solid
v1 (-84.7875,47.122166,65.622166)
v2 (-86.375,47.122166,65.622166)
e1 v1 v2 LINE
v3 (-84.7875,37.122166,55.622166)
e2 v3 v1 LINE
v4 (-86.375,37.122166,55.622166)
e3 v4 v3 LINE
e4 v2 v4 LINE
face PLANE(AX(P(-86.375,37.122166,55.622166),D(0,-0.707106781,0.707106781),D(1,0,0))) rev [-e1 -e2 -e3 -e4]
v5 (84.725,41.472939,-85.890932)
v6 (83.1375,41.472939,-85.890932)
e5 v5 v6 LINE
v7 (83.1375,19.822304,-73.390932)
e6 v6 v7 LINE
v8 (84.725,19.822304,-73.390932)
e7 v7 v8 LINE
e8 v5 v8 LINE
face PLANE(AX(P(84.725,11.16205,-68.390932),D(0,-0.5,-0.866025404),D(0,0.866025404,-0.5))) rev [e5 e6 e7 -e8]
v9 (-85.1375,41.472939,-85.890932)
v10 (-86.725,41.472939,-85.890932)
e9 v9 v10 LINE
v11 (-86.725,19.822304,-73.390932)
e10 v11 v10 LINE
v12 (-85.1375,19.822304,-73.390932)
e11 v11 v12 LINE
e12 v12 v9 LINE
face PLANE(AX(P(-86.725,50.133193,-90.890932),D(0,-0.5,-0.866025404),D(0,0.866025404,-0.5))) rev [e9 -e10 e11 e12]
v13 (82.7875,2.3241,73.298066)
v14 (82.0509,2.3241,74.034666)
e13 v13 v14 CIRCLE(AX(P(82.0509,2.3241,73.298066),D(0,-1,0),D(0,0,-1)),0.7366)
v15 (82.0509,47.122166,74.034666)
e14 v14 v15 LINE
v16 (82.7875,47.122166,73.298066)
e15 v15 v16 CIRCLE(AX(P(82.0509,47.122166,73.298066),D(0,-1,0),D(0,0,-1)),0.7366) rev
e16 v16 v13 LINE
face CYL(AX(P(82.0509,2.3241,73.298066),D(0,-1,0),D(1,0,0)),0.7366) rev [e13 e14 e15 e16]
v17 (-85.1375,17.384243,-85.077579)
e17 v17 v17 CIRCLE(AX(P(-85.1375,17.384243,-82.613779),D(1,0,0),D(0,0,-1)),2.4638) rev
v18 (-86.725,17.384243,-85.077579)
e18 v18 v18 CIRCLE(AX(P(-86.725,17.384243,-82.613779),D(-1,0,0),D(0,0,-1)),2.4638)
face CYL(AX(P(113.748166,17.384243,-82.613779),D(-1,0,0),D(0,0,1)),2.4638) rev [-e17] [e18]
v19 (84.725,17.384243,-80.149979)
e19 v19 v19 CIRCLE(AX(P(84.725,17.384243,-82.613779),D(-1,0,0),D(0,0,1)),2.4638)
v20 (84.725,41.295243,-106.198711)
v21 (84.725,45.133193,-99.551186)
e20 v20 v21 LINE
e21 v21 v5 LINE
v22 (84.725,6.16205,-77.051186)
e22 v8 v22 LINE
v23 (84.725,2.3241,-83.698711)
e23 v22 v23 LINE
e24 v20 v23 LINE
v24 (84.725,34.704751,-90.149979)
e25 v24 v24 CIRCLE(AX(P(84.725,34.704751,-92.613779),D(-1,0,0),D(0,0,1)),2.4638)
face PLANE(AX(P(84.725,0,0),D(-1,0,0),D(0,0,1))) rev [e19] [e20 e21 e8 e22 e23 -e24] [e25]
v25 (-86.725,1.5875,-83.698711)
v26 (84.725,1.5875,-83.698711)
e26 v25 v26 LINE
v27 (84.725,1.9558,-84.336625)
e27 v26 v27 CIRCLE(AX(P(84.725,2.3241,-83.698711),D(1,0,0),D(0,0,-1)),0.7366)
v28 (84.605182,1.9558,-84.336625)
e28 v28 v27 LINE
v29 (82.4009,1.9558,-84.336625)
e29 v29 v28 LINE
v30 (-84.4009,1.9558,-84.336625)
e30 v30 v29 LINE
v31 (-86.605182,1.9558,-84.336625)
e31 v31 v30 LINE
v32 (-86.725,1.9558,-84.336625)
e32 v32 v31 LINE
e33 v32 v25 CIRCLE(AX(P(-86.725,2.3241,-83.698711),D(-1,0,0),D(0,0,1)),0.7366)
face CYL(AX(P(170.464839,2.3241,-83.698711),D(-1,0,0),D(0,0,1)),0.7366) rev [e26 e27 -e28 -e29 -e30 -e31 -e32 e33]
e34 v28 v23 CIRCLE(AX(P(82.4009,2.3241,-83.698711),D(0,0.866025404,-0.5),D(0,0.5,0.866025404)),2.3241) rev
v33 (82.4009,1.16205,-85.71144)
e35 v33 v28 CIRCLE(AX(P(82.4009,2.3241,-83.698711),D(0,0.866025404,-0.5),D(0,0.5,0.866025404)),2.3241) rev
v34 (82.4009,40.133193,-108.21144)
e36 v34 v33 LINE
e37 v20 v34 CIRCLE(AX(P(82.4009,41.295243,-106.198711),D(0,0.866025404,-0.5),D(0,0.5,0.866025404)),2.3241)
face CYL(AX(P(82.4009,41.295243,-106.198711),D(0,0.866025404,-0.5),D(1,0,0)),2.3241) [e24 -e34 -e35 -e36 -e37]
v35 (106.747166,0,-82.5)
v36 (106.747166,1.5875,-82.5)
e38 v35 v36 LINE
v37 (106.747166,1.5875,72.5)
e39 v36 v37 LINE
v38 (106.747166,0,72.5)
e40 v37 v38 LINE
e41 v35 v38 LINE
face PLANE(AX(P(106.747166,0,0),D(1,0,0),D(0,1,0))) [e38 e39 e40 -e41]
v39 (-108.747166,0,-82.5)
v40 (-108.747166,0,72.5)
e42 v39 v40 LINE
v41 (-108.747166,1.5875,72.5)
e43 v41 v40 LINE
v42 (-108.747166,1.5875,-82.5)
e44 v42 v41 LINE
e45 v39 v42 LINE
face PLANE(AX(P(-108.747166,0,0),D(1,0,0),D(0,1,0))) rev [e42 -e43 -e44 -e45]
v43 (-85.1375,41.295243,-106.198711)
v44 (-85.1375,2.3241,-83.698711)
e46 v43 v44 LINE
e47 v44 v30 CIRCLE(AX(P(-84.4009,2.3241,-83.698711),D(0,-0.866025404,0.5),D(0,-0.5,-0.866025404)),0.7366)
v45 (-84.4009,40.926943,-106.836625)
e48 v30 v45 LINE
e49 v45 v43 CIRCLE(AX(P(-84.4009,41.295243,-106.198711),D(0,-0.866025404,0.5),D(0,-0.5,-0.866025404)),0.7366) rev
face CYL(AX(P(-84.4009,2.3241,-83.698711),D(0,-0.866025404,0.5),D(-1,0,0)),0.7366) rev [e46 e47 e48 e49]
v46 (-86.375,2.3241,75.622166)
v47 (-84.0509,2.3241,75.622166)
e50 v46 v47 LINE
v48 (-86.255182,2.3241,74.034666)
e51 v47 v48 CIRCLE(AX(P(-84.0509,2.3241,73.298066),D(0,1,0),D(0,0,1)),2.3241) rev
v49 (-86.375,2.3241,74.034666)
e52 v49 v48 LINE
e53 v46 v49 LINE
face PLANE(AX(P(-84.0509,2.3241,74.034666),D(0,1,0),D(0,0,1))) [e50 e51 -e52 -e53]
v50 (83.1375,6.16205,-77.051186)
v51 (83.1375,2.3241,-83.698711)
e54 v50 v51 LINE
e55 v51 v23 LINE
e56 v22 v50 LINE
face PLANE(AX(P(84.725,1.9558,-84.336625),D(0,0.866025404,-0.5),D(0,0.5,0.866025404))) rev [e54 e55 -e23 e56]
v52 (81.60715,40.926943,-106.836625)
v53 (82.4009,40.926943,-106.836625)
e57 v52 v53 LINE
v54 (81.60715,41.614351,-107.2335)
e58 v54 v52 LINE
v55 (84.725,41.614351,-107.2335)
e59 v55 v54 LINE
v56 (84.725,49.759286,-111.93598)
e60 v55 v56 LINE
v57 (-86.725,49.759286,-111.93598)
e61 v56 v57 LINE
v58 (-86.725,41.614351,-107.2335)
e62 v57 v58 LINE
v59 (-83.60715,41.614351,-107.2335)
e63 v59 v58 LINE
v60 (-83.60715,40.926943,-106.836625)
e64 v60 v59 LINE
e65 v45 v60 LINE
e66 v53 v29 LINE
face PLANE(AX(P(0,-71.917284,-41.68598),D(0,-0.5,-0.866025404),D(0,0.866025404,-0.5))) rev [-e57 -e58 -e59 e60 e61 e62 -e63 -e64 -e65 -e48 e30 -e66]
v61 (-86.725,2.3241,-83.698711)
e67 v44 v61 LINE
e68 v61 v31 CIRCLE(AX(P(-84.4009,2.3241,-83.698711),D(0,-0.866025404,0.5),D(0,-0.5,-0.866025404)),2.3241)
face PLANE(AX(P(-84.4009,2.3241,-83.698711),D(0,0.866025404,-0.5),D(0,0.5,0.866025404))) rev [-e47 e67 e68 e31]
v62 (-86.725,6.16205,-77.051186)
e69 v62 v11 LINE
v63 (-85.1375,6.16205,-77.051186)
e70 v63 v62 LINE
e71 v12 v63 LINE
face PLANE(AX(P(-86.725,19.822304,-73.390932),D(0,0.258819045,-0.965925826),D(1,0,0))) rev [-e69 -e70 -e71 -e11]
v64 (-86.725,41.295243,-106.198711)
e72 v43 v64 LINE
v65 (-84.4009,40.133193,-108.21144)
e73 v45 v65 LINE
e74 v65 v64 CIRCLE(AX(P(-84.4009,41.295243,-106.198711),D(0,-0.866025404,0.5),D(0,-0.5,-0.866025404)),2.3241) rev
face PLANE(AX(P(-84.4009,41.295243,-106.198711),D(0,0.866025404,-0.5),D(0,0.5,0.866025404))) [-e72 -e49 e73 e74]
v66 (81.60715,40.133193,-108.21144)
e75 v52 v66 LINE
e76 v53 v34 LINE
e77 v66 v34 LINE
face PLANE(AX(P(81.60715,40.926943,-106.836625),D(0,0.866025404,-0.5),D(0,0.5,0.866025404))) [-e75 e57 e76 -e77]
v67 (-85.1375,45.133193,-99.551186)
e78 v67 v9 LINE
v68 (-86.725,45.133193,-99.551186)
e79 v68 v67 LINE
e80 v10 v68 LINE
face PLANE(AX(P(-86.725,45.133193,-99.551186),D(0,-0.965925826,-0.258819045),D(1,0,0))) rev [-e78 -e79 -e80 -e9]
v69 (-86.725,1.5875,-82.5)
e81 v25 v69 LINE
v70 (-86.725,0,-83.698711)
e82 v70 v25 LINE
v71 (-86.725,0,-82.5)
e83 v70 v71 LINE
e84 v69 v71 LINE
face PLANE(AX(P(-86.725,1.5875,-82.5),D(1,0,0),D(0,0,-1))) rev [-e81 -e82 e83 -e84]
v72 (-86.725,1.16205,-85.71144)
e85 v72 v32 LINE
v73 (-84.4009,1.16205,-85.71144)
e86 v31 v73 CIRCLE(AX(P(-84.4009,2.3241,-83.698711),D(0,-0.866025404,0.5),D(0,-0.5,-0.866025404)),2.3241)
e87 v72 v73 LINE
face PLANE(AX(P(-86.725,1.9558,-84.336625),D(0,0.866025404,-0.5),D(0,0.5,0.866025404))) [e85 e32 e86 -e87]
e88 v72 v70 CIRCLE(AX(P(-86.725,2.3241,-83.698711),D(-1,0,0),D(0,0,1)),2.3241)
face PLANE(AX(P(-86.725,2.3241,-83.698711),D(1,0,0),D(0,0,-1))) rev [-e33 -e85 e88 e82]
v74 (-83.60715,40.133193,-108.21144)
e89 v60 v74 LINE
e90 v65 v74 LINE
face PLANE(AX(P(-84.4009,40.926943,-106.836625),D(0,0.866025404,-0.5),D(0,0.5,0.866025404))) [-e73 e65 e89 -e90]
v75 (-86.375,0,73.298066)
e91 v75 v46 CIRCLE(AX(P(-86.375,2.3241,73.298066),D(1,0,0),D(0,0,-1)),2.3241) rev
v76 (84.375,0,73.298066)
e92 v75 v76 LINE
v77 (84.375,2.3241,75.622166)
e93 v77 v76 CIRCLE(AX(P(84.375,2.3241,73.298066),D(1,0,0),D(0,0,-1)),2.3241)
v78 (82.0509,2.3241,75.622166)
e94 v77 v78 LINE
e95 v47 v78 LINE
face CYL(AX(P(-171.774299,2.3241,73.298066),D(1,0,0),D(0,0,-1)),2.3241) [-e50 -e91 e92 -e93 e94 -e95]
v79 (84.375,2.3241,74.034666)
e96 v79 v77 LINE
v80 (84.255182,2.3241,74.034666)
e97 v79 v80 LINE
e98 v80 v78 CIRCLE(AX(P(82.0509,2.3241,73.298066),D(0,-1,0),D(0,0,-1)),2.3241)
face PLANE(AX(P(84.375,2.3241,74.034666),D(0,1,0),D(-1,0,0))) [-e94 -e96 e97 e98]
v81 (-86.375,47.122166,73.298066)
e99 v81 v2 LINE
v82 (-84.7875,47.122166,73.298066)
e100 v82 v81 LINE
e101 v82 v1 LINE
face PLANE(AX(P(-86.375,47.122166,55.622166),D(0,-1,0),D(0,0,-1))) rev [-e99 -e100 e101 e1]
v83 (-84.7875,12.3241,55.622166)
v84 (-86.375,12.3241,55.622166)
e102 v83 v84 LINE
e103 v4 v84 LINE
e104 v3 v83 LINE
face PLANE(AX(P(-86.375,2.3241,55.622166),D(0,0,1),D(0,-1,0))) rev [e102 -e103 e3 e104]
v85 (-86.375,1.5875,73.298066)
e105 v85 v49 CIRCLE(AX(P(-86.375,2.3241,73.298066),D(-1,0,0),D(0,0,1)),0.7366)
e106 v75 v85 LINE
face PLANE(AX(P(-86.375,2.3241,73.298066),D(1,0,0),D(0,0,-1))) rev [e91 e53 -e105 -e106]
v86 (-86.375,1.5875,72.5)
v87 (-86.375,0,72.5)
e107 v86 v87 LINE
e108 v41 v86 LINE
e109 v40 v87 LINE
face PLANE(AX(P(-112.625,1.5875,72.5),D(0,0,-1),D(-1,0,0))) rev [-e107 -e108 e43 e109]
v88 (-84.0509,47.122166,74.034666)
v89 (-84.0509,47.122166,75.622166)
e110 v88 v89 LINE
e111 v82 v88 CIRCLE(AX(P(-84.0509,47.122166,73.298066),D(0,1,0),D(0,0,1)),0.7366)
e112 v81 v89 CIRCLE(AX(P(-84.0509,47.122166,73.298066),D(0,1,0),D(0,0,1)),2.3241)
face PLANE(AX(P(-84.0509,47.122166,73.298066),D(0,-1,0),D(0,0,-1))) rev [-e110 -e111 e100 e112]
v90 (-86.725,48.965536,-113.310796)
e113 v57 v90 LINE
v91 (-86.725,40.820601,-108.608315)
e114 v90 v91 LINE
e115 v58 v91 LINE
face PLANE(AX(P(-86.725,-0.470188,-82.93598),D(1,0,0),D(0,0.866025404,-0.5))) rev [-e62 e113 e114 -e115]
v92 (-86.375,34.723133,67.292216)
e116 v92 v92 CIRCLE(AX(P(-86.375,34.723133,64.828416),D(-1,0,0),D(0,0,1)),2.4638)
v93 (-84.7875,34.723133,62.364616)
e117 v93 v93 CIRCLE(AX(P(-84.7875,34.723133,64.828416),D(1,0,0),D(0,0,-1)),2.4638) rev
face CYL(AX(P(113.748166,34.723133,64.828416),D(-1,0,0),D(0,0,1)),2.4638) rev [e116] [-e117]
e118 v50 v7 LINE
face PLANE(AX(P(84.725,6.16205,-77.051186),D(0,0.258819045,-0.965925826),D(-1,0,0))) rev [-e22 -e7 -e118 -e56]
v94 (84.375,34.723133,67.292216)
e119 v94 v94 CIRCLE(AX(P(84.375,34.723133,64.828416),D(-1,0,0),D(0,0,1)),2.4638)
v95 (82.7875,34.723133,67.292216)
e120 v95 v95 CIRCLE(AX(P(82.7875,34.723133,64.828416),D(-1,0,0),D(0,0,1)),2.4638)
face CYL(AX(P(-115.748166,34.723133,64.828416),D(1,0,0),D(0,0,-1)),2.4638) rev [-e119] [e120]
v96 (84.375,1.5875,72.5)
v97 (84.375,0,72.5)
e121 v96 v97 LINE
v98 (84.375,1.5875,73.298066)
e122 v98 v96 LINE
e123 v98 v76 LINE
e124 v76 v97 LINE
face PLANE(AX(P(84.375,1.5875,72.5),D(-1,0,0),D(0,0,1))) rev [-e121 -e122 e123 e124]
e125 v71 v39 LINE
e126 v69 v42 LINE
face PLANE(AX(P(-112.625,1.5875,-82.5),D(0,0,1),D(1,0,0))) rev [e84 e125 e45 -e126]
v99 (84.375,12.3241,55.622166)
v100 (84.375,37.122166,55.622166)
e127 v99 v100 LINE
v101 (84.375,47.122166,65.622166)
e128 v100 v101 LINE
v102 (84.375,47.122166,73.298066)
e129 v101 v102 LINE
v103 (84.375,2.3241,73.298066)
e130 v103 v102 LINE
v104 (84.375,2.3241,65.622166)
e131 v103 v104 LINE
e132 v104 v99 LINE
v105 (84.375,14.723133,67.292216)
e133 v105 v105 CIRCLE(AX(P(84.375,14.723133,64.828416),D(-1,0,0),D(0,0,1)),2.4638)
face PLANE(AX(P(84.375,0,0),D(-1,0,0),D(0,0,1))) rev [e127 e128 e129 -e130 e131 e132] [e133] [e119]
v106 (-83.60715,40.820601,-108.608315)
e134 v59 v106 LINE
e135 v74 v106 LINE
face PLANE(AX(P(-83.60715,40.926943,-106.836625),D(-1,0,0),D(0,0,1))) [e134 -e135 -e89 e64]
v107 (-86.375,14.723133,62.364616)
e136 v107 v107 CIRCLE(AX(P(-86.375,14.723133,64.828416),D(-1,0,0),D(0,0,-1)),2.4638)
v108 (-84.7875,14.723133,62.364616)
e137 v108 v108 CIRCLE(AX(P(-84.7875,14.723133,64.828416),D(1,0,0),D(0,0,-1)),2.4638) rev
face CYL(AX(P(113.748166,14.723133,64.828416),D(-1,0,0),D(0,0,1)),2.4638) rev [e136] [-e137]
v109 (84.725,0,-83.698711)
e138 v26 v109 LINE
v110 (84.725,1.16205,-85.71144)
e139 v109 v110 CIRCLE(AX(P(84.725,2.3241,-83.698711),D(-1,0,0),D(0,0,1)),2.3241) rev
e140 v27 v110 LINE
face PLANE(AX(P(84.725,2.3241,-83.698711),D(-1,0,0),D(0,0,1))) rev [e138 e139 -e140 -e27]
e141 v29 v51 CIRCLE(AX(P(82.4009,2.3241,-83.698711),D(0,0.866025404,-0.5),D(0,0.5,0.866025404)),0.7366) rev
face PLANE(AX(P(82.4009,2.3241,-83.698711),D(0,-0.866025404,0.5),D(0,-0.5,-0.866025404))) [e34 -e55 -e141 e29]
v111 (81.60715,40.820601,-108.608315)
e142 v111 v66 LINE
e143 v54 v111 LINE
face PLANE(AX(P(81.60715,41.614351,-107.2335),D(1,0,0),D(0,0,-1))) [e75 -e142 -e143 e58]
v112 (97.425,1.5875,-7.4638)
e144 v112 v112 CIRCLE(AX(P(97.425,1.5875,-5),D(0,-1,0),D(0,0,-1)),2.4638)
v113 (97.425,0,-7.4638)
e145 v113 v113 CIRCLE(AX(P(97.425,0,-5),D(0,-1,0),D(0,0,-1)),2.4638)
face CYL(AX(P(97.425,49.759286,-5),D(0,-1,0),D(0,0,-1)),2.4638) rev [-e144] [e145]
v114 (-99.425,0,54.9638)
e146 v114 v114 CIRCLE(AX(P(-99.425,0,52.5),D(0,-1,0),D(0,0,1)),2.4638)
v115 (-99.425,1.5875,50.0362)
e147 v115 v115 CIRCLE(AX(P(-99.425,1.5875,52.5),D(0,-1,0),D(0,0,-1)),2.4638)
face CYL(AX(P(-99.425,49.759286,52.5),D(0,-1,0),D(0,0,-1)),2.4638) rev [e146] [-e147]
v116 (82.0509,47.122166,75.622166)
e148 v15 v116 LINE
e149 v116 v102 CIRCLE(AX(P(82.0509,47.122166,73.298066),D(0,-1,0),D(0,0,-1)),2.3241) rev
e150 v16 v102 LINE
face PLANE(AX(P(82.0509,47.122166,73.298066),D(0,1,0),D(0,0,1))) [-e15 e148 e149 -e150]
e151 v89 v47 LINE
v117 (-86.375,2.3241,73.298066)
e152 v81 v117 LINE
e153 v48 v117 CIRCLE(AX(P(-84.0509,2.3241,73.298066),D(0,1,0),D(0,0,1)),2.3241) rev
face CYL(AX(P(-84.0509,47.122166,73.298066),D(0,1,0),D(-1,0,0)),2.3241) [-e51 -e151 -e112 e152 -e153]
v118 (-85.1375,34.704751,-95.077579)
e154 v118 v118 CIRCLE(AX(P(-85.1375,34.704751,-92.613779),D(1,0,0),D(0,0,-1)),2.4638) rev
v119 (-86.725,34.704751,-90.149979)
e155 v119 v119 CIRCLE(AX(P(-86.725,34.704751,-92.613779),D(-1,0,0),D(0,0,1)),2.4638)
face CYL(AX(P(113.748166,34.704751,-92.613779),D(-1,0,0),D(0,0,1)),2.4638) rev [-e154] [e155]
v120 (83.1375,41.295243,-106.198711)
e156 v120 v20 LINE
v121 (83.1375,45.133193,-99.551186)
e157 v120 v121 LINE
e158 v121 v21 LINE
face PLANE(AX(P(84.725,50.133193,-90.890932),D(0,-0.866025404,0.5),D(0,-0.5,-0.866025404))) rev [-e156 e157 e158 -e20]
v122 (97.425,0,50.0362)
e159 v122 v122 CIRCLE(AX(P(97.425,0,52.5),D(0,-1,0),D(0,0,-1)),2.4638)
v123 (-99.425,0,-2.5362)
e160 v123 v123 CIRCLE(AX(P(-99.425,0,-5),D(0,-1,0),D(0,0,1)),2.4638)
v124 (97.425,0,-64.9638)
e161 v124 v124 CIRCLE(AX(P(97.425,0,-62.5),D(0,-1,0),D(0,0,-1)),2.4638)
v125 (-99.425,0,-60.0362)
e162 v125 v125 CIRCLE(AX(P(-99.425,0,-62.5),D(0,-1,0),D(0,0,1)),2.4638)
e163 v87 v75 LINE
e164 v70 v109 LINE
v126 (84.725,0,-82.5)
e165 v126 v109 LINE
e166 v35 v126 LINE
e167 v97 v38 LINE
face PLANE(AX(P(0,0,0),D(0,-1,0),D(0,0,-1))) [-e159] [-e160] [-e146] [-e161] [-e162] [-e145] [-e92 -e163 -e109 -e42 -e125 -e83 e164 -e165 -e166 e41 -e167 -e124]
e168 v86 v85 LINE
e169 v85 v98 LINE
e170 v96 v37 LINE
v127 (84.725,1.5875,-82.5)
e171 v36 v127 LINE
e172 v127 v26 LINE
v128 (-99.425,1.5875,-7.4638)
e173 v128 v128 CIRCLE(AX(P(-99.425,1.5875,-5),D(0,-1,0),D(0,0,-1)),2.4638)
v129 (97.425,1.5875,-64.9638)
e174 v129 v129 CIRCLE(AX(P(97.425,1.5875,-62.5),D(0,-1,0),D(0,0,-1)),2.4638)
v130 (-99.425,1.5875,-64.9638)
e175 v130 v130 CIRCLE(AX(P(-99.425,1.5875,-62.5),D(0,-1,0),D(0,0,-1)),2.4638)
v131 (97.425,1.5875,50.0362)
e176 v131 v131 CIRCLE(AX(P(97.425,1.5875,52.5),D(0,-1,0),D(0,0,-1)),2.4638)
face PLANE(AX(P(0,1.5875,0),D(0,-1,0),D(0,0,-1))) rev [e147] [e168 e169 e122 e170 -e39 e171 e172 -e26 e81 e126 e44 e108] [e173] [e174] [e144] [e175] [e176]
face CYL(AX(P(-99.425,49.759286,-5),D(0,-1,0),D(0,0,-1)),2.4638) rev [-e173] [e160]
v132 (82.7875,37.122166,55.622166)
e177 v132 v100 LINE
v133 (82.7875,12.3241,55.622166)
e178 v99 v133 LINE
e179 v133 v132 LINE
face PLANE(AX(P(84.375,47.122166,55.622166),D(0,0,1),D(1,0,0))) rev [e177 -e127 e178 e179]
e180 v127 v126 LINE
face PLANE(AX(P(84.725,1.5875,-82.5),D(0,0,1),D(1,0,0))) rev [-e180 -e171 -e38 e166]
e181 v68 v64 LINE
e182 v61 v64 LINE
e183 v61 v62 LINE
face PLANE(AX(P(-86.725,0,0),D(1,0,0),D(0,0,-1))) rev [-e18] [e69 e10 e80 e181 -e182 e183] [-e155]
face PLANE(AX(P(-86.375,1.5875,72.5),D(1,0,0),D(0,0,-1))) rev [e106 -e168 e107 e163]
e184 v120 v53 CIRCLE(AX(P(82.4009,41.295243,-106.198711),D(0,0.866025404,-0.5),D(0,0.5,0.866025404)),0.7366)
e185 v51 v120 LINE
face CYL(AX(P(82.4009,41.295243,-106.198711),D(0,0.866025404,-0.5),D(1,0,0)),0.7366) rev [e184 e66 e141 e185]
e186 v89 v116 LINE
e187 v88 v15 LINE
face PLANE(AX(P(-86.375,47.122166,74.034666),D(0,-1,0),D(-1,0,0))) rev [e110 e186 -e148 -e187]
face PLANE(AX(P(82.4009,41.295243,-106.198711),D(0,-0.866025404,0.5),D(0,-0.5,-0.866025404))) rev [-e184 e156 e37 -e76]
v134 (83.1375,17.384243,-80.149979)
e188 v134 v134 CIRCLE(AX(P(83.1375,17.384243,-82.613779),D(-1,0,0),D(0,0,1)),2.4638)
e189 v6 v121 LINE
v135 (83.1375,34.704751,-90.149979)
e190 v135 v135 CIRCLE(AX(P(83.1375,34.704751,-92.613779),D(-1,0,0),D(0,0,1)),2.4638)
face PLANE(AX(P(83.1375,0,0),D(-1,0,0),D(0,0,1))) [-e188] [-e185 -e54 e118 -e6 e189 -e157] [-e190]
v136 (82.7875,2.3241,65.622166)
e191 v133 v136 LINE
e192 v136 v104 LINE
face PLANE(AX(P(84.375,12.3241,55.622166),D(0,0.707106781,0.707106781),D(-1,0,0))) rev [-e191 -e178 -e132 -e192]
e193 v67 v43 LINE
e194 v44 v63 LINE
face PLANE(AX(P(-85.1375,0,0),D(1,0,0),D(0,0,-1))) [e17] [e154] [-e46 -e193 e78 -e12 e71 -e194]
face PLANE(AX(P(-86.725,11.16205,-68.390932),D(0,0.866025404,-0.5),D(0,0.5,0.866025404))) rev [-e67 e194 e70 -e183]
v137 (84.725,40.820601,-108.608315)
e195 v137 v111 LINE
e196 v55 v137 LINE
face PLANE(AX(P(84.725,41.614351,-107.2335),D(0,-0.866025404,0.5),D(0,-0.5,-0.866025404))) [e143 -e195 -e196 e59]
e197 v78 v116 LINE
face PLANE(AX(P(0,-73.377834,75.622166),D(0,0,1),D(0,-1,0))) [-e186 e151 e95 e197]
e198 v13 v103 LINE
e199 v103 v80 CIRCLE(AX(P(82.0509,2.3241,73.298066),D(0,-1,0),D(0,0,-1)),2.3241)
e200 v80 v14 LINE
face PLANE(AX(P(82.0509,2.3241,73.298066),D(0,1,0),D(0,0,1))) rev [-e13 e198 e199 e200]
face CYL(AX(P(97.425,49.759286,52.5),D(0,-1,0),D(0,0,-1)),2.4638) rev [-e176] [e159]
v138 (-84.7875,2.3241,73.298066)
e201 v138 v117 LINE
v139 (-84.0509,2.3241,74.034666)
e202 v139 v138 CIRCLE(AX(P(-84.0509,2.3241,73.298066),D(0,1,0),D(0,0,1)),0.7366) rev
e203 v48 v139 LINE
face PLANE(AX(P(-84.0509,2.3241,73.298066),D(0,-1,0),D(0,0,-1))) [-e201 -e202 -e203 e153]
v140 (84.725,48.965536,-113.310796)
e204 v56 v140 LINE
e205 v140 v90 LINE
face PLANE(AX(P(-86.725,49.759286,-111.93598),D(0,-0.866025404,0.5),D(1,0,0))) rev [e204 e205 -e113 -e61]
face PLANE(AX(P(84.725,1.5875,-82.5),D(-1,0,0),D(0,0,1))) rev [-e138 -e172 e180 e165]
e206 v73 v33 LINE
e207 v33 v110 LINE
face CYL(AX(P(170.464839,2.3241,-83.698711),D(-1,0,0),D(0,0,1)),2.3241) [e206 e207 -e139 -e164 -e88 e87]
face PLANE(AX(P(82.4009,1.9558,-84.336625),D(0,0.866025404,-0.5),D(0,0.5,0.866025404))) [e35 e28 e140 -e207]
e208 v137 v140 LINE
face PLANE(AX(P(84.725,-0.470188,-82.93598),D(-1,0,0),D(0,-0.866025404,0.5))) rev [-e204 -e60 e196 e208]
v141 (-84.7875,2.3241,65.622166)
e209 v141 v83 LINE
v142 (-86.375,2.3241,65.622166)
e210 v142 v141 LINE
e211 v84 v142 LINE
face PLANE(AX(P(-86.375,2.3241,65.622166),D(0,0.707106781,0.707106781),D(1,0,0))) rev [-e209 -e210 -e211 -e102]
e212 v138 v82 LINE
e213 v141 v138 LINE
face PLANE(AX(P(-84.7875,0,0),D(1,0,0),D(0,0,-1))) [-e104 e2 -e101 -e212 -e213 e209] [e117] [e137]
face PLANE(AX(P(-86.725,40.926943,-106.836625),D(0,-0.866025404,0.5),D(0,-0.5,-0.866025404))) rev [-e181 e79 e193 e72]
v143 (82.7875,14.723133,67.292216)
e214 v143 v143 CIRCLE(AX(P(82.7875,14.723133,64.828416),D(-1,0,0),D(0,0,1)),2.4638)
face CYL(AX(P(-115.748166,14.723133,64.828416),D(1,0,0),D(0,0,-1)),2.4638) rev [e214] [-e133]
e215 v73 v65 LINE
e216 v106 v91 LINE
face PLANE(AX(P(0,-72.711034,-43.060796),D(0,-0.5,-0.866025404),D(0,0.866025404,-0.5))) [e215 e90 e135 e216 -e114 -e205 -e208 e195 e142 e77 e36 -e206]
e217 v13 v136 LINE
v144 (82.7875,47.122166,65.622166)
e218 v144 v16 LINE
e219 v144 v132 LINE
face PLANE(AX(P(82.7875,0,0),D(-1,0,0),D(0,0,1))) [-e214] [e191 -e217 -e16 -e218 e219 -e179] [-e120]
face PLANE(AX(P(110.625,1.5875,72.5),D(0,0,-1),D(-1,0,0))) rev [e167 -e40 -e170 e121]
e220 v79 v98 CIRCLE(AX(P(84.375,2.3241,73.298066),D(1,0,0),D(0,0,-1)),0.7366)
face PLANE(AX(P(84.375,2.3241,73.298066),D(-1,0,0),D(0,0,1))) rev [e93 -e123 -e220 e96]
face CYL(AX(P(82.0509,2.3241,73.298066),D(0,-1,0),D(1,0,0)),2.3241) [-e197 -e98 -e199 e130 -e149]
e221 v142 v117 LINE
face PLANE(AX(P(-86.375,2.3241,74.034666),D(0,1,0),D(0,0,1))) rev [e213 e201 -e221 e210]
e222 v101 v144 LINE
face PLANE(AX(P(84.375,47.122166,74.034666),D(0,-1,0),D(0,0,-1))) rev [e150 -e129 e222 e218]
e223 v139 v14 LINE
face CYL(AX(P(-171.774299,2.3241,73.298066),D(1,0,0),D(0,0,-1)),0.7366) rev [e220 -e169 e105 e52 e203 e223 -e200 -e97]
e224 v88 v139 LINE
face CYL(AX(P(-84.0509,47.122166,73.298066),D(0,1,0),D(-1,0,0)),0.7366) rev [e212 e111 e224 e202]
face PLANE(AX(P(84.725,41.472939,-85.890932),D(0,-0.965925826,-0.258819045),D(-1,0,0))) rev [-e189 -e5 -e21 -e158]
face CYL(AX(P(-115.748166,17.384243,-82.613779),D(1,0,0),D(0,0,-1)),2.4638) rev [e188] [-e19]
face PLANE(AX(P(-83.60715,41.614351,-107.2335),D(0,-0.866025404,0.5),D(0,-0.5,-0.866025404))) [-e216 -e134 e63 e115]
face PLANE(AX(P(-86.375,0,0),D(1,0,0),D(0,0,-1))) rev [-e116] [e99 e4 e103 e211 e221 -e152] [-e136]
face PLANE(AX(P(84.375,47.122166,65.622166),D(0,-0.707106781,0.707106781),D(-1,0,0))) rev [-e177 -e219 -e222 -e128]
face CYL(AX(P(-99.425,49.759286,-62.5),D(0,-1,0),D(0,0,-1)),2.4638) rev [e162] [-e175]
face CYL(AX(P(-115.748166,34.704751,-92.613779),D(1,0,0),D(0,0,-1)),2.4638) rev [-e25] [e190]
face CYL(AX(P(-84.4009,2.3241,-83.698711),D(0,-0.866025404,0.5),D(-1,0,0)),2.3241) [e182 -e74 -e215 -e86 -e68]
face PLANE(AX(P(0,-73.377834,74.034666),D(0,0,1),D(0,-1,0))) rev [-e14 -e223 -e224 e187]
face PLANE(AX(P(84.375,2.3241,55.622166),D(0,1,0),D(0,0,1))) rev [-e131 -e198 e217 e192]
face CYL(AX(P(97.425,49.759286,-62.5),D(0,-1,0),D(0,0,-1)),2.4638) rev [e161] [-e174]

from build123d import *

# Parameters (mm, degrees)
BASE_FLANGE1_DEPTH             = 1.5875
SKETCHED_START                 = -86.375
SKETCHED_BEND1_DEPTH           = 170.75
SKETCHED_START_2               = -82.5
SKETCHED_BEND1_2_DEPTH         = 155
SKETCHED_BEND1_3_DEPTH         = 170.75
SKETCHED_START_3               = -160.625
SKETCHED_BEND1_4_OUTLINE_W     = 1.5875
SKETCHED_BEND1_4_OUTLINE_H     = 155
SKETCHED_BEND1_4_DEPTH         = 44.877834079
SKETCHED_START_4               = 113.747165921
SKETCHED_BEND1_5_OUTLINE_W     = 1.5875
SKETCHED_BEND1_5_OUTLINE_H     = 155
SKETCHED_BEND1_5_DEPTH         = 44.877834079
SKETCHED_BEND1_6_DEPTH         = 155
SKETCHED_START_5               = 75.622165921
SKETCHED_BEND1_7_OUTLINE_W     = 170.75
SKETCHED_BEND1_7_OUTLINE_H     = 1.5875
SKETCHED_BEND1_7_DEPTH         = 44.877834079
SKETCHED_START_6               = -86.725
SKETCHED_BEND2_DEPTH           = 171.45
SKETCHED_BEND2_2_DEPTH         = 171.45
EDGE_FLANGE1_STRIP_W           = 7.8232
EDGE_FLANGE1_STRIP_H           = 1.5875
EDGE_FLANGE1_STRIP_CUT_DEPTH   = 44.798065921
EDGE_FLANGE1_STRIP_2_W         = 7.8232
EDGE_FLANGE1_STRIP_2_H         = 1.5875
EDGE_FLANGE1_STRIP_CUT_2_DEPTH = 44.798065921
EDGE_FLANGE1_DEPTH             = 44.798065921
EDGE_FLANGE1_BEND_DEPTH        = 44.798065921
EDGE_FLANGE2_START             = 43.862084948
EDGE_FLANGE2_DEPTH             = 45.79375
EDGE_FLANGE2_START_2           = 88.862084948
EDGE_FLANGE2_2_DEPTH           = 0.79375
EDGE_FLANGE2_3_DEPTH           = 45
BREAK_CORNER1_START            = -86.725
BREAK_CORNER1_DEPTH            = 171.45
BOSS_EXTRUDE2_START            = -1.5875
BOSS_EXTRUDE2_DEPTH            = 1.5875
BOSS_EXTRUDE3_DEPTH            = 1.5875
CUT_EXTRUDE1_REACH             = 244.631
SKETCH24_R                     = 2.4638
CUT_EXTRUDE2_REACH             = 244.342
SKETCH26_R                     = 2.4638
SKETCH27_W                     = 214.486609943
SKETCH27_H                     = 74.493622792
CUT_EXTRUDE3_DEPTH             = 7
SKETCH28_W                     = 221.663194744
SKETCH28_H                     = 88.143732651
CUT_EXTRUDE4_DEPTH             = 7
SKETCH34_R                     = 2.4638
CUT_EXTRUDE6_DEPTH             = 165.746074293


# Read off the part's stored shape, not the designer's step: Sketched Bend1, Sketched Bend2, Edge-Flange2, Break-Corner1
# Sheet-metal steps are written as plain solids
with BuildPart() as part:
    # Sketch1 → Base-Flange1 (new body)
    with BuildSketch(Plane(origin=(0, 0, 0), x_dir=(1, 0, 0), z_dir=(0, 1, 0))):
        Polygon((-86.375, -72.5), (-86.375, -120.5), (84.375, -120.5), (84.375, -72.5), (110.625, -72.5), (158.625, -72.5), (158.625, 82.5), (110.625, 82.5), (84.725, 82.5), (84.725, 140.5), (-86.725, 140.5), (-86.725, 82.5), (-112.625, 82.5), (-160.625, 82.5), (-160.625, -72.5), (-112.625, -72.5), align=None)
    extrude(amount=BASE_FLANGE1_DEPTH)

    # Sketched Bend1 outline → Sketched Bend1 (add)
    with BuildSketch(Plane.YZ.offset(SKETCHED_START)):
        with BuildLine():
            Line((47.122165921, 74.034665921), (47.122165921, 75.622165921))
            Line((47.122165921, 75.622165921), (2.3241, 75.622165921))
            ThreePointArc((2.3241, 75.622165921), (1.950959343, 75.592015977), (1.5875, 75.5023484))
            Line((1.5875, 75.5023484), (1.5875, 73.298065921))
            ThreePointArc((1.5875, 73.298065921), (1.803245145, 73.818920776), (2.3241, 74.034665921))
            Line((2.3241, 74.034665921), (47.122165921, 74.034665921))
        make_face()
    extrude(amount=SKETCHED_BEND1_DEPTH)

    # Sketched Bend1 2 outline → Sketched Bend1 2 (add)
    with BuildSketch(Plane.XY.offset(SKETCHED_START_2)):
        with BuildLine():
            ThreePointArc((-113.423065921, 1.5875), (-113.943920776, 1.803245145), (-114.159665921, 2.3241))
            Line((-114.159665921, 2.3241), (-114.159665921, 47.122165921))
            Line((-114.159665921, 47.122165921), (-115.747165921, 47.122165921))
            Line((-115.747165921, 47.122165921), (-115.747165921, 2.3241))
            ThreePointArc((-115.747165921, 2.3241), (-115.717015977, 1.950959343), (-115.6273484, 1.5875))
            Line((-115.6273484, 1.5875), (-113.423065921, 1.5875))
        make_face()
        with BuildLine():
            ThreePointArc((112.159665921, 2.3241), (111.943920776, 1.803245145), (111.423065921, 1.5875))
            Line((111.423065921, 1.5875), (113.6273484, 1.5875))
            ThreePointArc((113.6273484, 1.5875), (113.717015977, 1.950959343), (113.747165921, 2.3241))
            Line((113.747165921, 2.3241), (113.747165921, 47.122165921))
            Line((113.747165921, 47.122165921), (112.159665921, 47.122165921))
            Line((112.159665921, 47.122165921), (112.159665921, 2.3241))
        make_face()
    extrude(amount=SKETCHED_BEND1_2_DEPTH)

    # Sketched Bend1 3 outline → Sketched Bend1 3 (cut)
    with BuildSketch(Plane.YZ.offset(SKETCHED_START)):
        with BuildLine():
            ThreePointArc((0, 73.298065921), (0.438182071, 74.656283273), (1.5875, 75.5023484))
            Line((1.5875, 75.5023484), (1.5875, 120.5))
            Line((1.5875, 120.5), (0, 120.5))
            Line((0, 120.5), (0, 73.298065921))
        make_face()
    extrude(amount=SKETCHED_BEND1_3_DEPTH, mode=Mode.SUBTRACT)

    # Sketched Bend1 4 outline → Sketched Bend1 4 (cut)
    with BuildSketch(Plane.YZ.offset(SKETCHED_START_3)):
        with Locations((0.79375, -5)):
            Rectangle(SKETCHED_BEND1_4_OUTLINE_W, SKETCHED_BEND1_4_OUTLINE_H)
    extrude(amount=SKETCHED_BEND1_4_DEPTH, mode=Mode.SUBTRACT)

    # Sketched Bend1 5 outline → Sketched Bend1 5 (cut)
    with BuildSketch(Plane.YZ.offset(SKETCHED_START_4)):
        with Locations((0.79375, -5)):
            Rectangle(SKETCHED_BEND1_5_OUTLINE_W, SKETCHED_BEND1_5_OUTLINE_H)
    extrude(amount=SKETCHED_BEND1_5_DEPTH, mode=Mode.SUBTRACT)

    # Sketched Bend1 6 outline → Sketched Bend1 6 (cut)
    with BuildSketch(Plane.XY.offset(SKETCHED_START_2)):
        with BuildLine():
            ThreePointArc((-113.423065921, 0), (-114.781283273, 0.438182071), (-115.6273484, 1.5875))
            Line((-115.6273484, 1.5875), (-160.625, 1.5875))
            Line((-160.625, 1.5875), (-160.625, 0))
            Line((-160.625, 0), (-113.423065921, 0))
        make_face()
        with BuildLine():
            Line((158.625, 1.5875), (113.6273484, 1.5875))
            ThreePointArc((113.6273484, 1.5875), (112.781283273, 0.438182071), (111.423065921, 0))
            Line((111.423065921, 0), (158.625, 0))
            Line((158.625, 0), (158.625, 1.5875))
        make_face()
    extrude(amount=SKETCHED_BEND1_6_DEPTH, mode=Mode.SUBTRACT)

    # Sketched Bend1 7 outline → Sketched Bend1 7 (cut)
    with BuildSketch(Plane.XY.offset(SKETCHED_START_5)):
        with Locations((-1, 0.79375)):
            Rectangle(SKETCHED_BEND1_7_OUTLINE_W, SKETCHED_BEND1_7_OUTLINE_H)
    extrude(amount=SKETCHED_BEND1_7_DEPTH, mode=Mode.SUBTRACT)

    # Sketched Bend2 outline → Sketched Bend2 (cut)
    with BuildSketch(Plane.YZ.offset(SKETCHED_START_6)):
        with BuildLine():
            Line((1.5875, -140.5), (1.5875, -85.957073927))
            Line((1.5875, -85.957073927), (1.16205, -85.711440255))
            ThreePointArc((1.16205, -85.711440255), (0.311370359, -84.860760614), (0, -83.698710614))
            Line((0, -83.698710614), (0, -140.5))
            Line((0, -140.5), (1.5875, -140.5))
        make_face()
    extrude(amount=SKETCHED_BEND2_DEPTH, mode=Mode.SUBTRACT)

    # Sketched Bend2 2 outline → Sketched Bend2 2 (add)
    with BuildSketch(Plane.YZ.offset(SKETCHED_START_6)):
        with BuildLine():
            Line((49.759285648, -111.935980233), (1.9558, -84.336624926))
            ThreePointArc((1.9558, -84.336624926), (1.686185688, -84.067010614), (1.5875, -83.698710614))
            Line((1.5875, -83.698710614), (1.5875, -85.957073927))
            Line((1.5875, -85.957073927), (48.965535648, -113.310795562))
            Line((48.965535648, -113.310795562), (49.759285648, -111.935980233))
        make_face()
    extrude(amount=SKETCHED_BEND2_2_DEPTH)

    # Edge-Flange1 strip (across the edge) → Edge-Flange1 strip cut (cut)
    with BuildSketch(Plane(origin=(84.375, 47.122165921, 74.034665921), x_dir=(-1, 0, 0), z_dir=(0, -1, 0))):
        with Locations((-1.5875, -0.79375)):
            Rectangle(EDGE_FLANGE1_STRIP_W, EDGE_FLANGE1_STRIP_H)
    extrude(amount=EDGE_FLANGE1_STRIP_CUT_DEPTH, mode=Mode.SUBTRACT)

    # Edge-Flange1 strip 2 (across the edge) → Edge-Flange1 strip cut 2 (cut)
    with BuildSketch(Plane(origin=(-86.375, 2.3241, 74.034665921), x_dir=(1, 0, 0), z_dir=(0, 1, 0))):
        with Locations((-1.5875, -0.79375)):
            Rectangle(EDGE_FLANGE1_STRIP_2_W, EDGE_FLANGE1_STRIP_2_H)
    extrude(amount=EDGE_FLANGE1_STRIP_CUT_2_DEPTH, mode=Mode.SUBTRACT)

    # Edge-Flange1 section (across the edge) → Edge-Flange1 (add)
    with BuildSketch(Plane(origin=(84.375, 47.122165921, 74.034665921), x_dir=(-1, 0, 0), z_dir=(0, -1, 0))):
        with BuildLine():
            Line((0, 0.7366), (0, 18.4125))
            Line((0, 18.4125), (1.5875, 18.4125))
            Line((1.5875, 18.4125), (1.5875, 0.7366))
            ThreePointArc((1.5875, 0.7366), (1.803245145, 0.215745145), (2.3241, 0))
            Line((2.3241, 0), (2.3241, -1.5875))
            ThreePointArc((2.3241, -1.5875), (0.68071313, -0.90678687), (0, 0.7366))
        make_face()
    extrude(amount=EDGE_FLANGE1_DEPTH)

    # Edge-Flange1 section 2 (across the edge) → Edge-Flange1 bend (add)
    with BuildSketch(Plane(origin=(-86.375, 2.3241, 74.034665921), x_dir=(1, 0, 0), z_dir=(0, 1, 0))):
        with BuildLine():
            Line((0, 0.7366), (0, 18.4125))
            Line((0, 18.4125), (1.5875, 18.4125))
            Line((1.5875, 18.4125), (1.5875, 0.7366))
            ThreePointArc((1.5875, 0.7366), (1.803245145, 0.215745145), (2.3241, 0))
            Line((2.3241, 0), (2.3241, -1.5875))
            ThreePointArc((2.3241, -1.5875), (0.68071313, -0.90678687), (0, 0.7366))
        make_face()
    extrude(amount=EDGE_FLANGE1_BEND_DEPTH)

    # Edge-Flange2 outline → Edge-Flange2 (cut)
    with BuildSketch(Plane(origin=(0, 0, 0), x_dir=(1, 0, 0), z_dir=(0, 0.8660254037844406, -0.4999999999999967)).offset(EDGE_FLANGE2_START)):
        with BuildLine():
            Line((-86.725, 72.059759656), (-86.605182479, 72.059759656))
            ThreePointArc((-86.605182479, 72.059759656), (-85.759117352, 73.209077585), (-84.4009, 73.647259656))
            Line((-84.4009, 73.647259656), (-86.725, 73.647259656))
            Line((-86.725, 73.647259656), (-86.725, 72.059759656))
        make_face()
        with BuildLine():
            Line((84.725, 73.647259656), (82.4009, 73.647259656))
            ThreePointArc((82.4009, 73.647259656), (83.759117352, 73.209077585), (84.605182479, 72.059759656))
            Line((84.605182479, 72.059759656), (84.725, 72.059759656))
            Line((84.725, 72.059759656), (84.725, 73.647259656))
        make_face()
    extrude(amount=EDGE_FLANGE2_DEPTH, mode=Mode.SUBTRACT)

    # Edge-Flange2 2 outline → Edge-Flange2 2 (cut)
    with BuildSketch(Plane(origin=(0, 0, 0), x_dir=(1, 0, 0), z_dir=(0, 0.8660254037844406, -0.4999999999999967)).offset(EDGE_FLANGE2_START_2)):
        with BuildLine():
            ThreePointArc((-84.4009, 73.647259656), (-85.759117352, 73.209077585), (-86.605182479, 72.059759656))
            Line((-86.605182479, 72.059759656), (-83.60715, 72.059759656))
            Line((-83.60715, 72.059759656), (-83.60715, 73.647259656))
            Line((-83.60715, 73.647259656), (-84.4009, 73.647259656))
        make_face()
        with BuildLine():
            Line((81.60715, 73.647259656), (81.60715, 72.059759656))
            Line((81.60715, 72.059759656), (84.605182479, 72.059759656))
            ThreePointArc((84.605182479, 72.059759656), (83.759117352, 73.209077585), (82.4009, 73.647259656))
            Line((82.4009, 73.647259656), (81.60715, 73.647259656))
        make_face()
    extrude(amount=EDGE_FLANGE2_2_DEPTH, mode=Mode.SUBTRACT)

    # Edge-Flange2 3 outline → Edge-Flange2 3 (add)
    with BuildSketch(Plane(origin=(0, 0, 0), x_dir=(1, 0, 0), z_dir=(0, 0.8660254037844406, -0.4999999999999967)).offset(EDGE_FLANGE2_START)):
        with BuildLine():
            Line((-86.725, 71.323159656), (-86.725, 53.647259656))
            Line((-86.725, 53.647259656), (-85.1375, 53.647259656))
            Line((-85.1375, 53.647259656), (-85.1375, 71.323159656))
            ThreePointArc((-85.1375, 71.323159656), (-84.921754855, 71.844014511), (-84.4009, 72.059759656))
            Line((-84.4009, 72.059759656), (-86.605182479, 72.059759656))
            ThreePointArc((-86.605182479, 72.059759656), (-86.694850056, 71.696300313), (-86.725, 71.323159656))
        make_face()
        with BuildLine():
            Line((84.605182479, 72.059759656), (82.4009, 72.059759656))
            ThreePointArc((82.4009, 72.059759656), (82.921754855, 71.844014511), (83.1375, 71.323159656))
            Line((83.1375, 71.323159656), (83.1375, 53.647259656))
            Line((83.1375, 53.647259656), (84.725, 53.647259656))
            Line((84.725, 53.647259656), (84.725, 71.323159656))
            ThreePointArc((84.725, 71.323159656), (84.694850056, 71.696300313), (84.605182479, 72.059759656))
        make_face()
    extrude(amount=EDGE_FLANGE2_3_DEPTH)

    # Break-Corner1 outline → Break-Corner1 (cut)
    with BuildSketch(Plane.YZ.offset(BREAK_CORNER1_START)):
        Polygon((50.13319317, -90.890932179), (41.472939132, -85.890932179), (45.13319317, -99.551186217), align=None)
        Polygon((6.16205, -77.051186217), (19.822304038, -73.390932179), (11.16205, -68.390932179), align=None)
        Polygon((47.122165921, 55.622165921), (47.122165921, 65.622165921), (37.122165921, 55.622165921), align=None)
        Polygon((2.3241, 55.622165921), (12.3241, 55.622165921), (2.3241, 65.622165921), align=None)
    extrude(amount=BREAK_CORNER1_DEPTH, mode=Mode.SUBTRACT)

    # Sketch21 → Boss-Extrude2 (add)
    with BuildSketch(Plane.ZY.offset(115.747165921).offset(BOSS_EXTRUDE2_START)):
        Polygon((-82.5, 2.3241), (-82.5, 47.122165921), (-127.298065921, 47.122165921), align=None)
    extrude(amount=BOSS_EXTRUDE2_DEPTH)

    # Sketch22 → Boss-Extrude3 (add)
    with BuildSketch(Plane(origin=(113.747165921, 0, 0), x_dir=(0, 0, -1), z_dir=(1, 0, 0))):
        Polygon((82.5, 2.3241), (82.5, 47.122165921), (127.298065921, 47.122165921), align=None)
    extrude(amount=-BOSS_EXTRUDE3_DEPTH)

    # Sketch24 → Cut-Extrude1 (cut, up to next)
    with BuildSketch(Plane.ZY.offset(86.725), mode=Mode.PRIVATE) as cut_extrude1_sk1:
        with Locations((-92.613778553, 34.704750623)):
            Circle(SKETCH24_R)
    cut_extrude1_tool1 = extrude(cut_extrude1_sk1.sketch, amount=-CUT_EXTRUDE1_REACH, mode=Mode.PRIVATE) & part.part
    # Sketch24 → Cut-Extrude1 (cut, up to next)
    with BuildSketch(Plane.ZY.offset(86.725), mode=Mode.PRIVATE) as cut_extrude1_sk2:
        with Locations(Location((-82.613778553, 17.384242547, 0), (0, 0, 180))):
            Circle(SKETCH24_R)
    cut_extrude1_tool2 = extrude(cut_extrude1_sk2.sketch, amount=-CUT_EXTRUDE1_REACH, mode=Mode.PRIVATE) & part.part
    cut_extrude1_1 = cut_extrude1_tool1.solids().sort_by_distance((-86.725, 34.704751, -92.613779))[0]
    add(cut_extrude1_1, mode=Mode.SUBTRACT)
    cut_extrude1_2 = cut_extrude1_tool2.solids().sort_by_distance((-86.725, 17.384243, -82.613779))[0]
    add(cut_extrude1_2, mode=Mode.SUBTRACT)
    cut_extrude1 = cut_extrude1_1 + cut_extrude1_2  # Cut-Extrude1 as one shape, for the pattern or mirror that repeats it

    # Sketch26 → Cut-Extrude2 (cut, up to next)
    with BuildSketch(Plane.ZY.offset(86.375), mode=Mode.PRIVATE) as cut_extrude2_sk1:
        with Locations((64.828415921, 34.72313296)):
            Circle(SKETCH26_R)
    cut_extrude2_tool1 = extrude(cut_extrude2_sk1.sketch, amount=-CUT_EXTRUDE2_REACH, mode=Mode.PRIVATE) & part.part
    # Sketch26 → Cut-Extrude2 (cut, up to next)
    with BuildSketch(Plane.ZY.offset(86.375), mode=Mode.PRIVATE) as cut_extrude2_sk2:
        with Locations(Location((64.828415921, 14.72313296, 0), (0, 0, 180))):
            Circle(SKETCH26_R)
    cut_extrude2_tool2 = extrude(cut_extrude2_sk2.sketch, amount=-CUT_EXTRUDE2_REACH, mode=Mode.PRIVATE) & part.part
    cut_extrude2_1 = cut_extrude2_tool1.solids().sort_by_distance((-86.375, 34.723133, 64.828416))[0]
    add(cut_extrude2_1, mode=Mode.SUBTRACT)
    cut_extrude2_2 = cut_extrude2_tool2.solids().sort_by_distance((-86.375, 14.723133, 64.828416))[0]
    add(cut_extrude2_2, mode=Mode.SUBTRACT)
    cut_extrude2 = cut_extrude2_1 + cut_extrude2_2  # Cut-Extrude2 as one shape, for the pattern or mirror that repeats it

    # Mirror1: Cut-Extrude1, Cut-Extrude2 mirrored; each copy of Cut-Extrude1, Cut-Extrude2 runs up to whatever stops it at its own place
    mirror1_before = part.part  # the part as the pattern finds it: every copy runs up to it
    mirror1_cut_extrude1_long1 = extrude(cut_extrude1_sk1.sketch, amount=-CUT_EXTRUDE1_REACH, mode=Mode.PRIVATE)
    mirror1_cut_extrude1_long2 = extrude(cut_extrude1_sk2.sketch, amount=-CUT_EXTRUDE1_REACH, mode=Mode.PRIVATE)
    mirror1_cut_extrude1_tool1_1 = mirror1_cut_extrude1_long1.mirror(Plane(origin=(0, 0, 0), x_dir=(0, 0, 1), z_dir=(1, 0, 0))) & mirror1_before
    add(mirror1_cut_extrude1_tool1_1.solids().sort_by_distance((86.725, 34.704751, -92.613779))[0], mode=Mode.SUBTRACT)
    mirror1_cut_extrude1_tool2_1 = mirror1_cut_extrude1_long2.mirror(Plane(origin=(0, 0, 0), x_dir=(0, 0, 1), z_dir=(1, 0, 0))) & mirror1_before
    add(mirror1_cut_extrude1_tool2_1.solids().sort_by_distance((86.725, 17.384243, -82.613779))[0], mode=Mode.SUBTRACT)
    mirror1_cut_extrude2_long1 = extrude(cut_extrude2_sk1.sketch, amount=-CUT_EXTRUDE2_REACH, mode=Mode.PRIVATE)
    mirror1_cut_extrude2_long2 = extrude(cut_extrude2_sk2.sketch, amount=-CUT_EXTRUDE2_REACH, mode=Mode.PRIVATE)
    mirror1_cut_extrude2_tool1_1 = mirror1_cut_extrude2_long1.mirror(Plane(origin=(0, 0, 0), x_dir=(0, 0, 1), z_dir=(1, 0, 0))) & mirror1_before
    add(mirror1_cut_extrude2_tool1_1.solids().sort_by_distance((86.375, 34.723133, 64.828416))[0], mode=Mode.SUBTRACT)
    mirror1_cut_extrude2_tool2_1 = mirror1_cut_extrude2_long2.mirror(Plane(origin=(0, 0, 0), x_dir=(0, 0, 1), z_dir=(1, 0, 0))) & mirror1_before
    add(mirror1_cut_extrude2_tool2_1.solids().sort_by_distance((86.375, 14.723133, 64.828416))[0], mode=Mode.SUBTRACT)

    # Sketch27 → Cut-Extrude3 (cut)
    with BuildSketch(Plane.ZY.offset(115.747165921)):
        with Locations((-25.482320462, 18.910964918)):
            Rectangle(SKETCH27_W, SKETCH27_H)
    extrude(amount=-CUT_EXTRUDE3_DEPTH, mode=Mode.SUBTRACT)

    # Sketch28 → Cut-Extrude4 (cut)
    with BuildSketch(Plane(origin=(113.747165921, 0, 0), x_dir=(0, 0, -1), z_dir=(1, 0, 0))):
        with Locations((27.271761176, 22.455760889)):
            Rectangle(SKETCH28_W, SKETCH28_H)
    extrude(amount=-CUT_EXTRUDE4_DEPTH, mode=Mode.SUBTRACT)

    # Sketch34 → Cut-Extrude6 (cut, through all)
    with BuildSketch(Plane(origin=(0, 0, 0), x_dir=(-1, 0, 0), z_dir=(0, -1, 0))):
        with Locations(Location((-97.425, -52.5, 0), (0, 0, 90))):
            Circle(SKETCH34_R)
        with Locations(Location((-97.425, 62.5, 0), (0, 0, 90))):
            Circle(SKETCH34_R)
        with Locations(Location((-97.425, 5, 0), (0, 0, 90))):
            Circle(SKETCH34_R)
        with Locations(Location((99.425, -52.5, 0), (0, 0, 90))):
            Circle(SKETCH34_R)
        with Locations(Location((99.425, 5, 0), (0, 0, 90))):
            Circle(SKETCH34_R)
        with Locations(Location((99.425, 62.5, 0), (0, 0, 90))):
            Circle(SKETCH34_R)
    extrude(amount=-CUT_EXTRUDE6_DEPTH, mode=Mode.SUBTRACT)


solid = part.part
